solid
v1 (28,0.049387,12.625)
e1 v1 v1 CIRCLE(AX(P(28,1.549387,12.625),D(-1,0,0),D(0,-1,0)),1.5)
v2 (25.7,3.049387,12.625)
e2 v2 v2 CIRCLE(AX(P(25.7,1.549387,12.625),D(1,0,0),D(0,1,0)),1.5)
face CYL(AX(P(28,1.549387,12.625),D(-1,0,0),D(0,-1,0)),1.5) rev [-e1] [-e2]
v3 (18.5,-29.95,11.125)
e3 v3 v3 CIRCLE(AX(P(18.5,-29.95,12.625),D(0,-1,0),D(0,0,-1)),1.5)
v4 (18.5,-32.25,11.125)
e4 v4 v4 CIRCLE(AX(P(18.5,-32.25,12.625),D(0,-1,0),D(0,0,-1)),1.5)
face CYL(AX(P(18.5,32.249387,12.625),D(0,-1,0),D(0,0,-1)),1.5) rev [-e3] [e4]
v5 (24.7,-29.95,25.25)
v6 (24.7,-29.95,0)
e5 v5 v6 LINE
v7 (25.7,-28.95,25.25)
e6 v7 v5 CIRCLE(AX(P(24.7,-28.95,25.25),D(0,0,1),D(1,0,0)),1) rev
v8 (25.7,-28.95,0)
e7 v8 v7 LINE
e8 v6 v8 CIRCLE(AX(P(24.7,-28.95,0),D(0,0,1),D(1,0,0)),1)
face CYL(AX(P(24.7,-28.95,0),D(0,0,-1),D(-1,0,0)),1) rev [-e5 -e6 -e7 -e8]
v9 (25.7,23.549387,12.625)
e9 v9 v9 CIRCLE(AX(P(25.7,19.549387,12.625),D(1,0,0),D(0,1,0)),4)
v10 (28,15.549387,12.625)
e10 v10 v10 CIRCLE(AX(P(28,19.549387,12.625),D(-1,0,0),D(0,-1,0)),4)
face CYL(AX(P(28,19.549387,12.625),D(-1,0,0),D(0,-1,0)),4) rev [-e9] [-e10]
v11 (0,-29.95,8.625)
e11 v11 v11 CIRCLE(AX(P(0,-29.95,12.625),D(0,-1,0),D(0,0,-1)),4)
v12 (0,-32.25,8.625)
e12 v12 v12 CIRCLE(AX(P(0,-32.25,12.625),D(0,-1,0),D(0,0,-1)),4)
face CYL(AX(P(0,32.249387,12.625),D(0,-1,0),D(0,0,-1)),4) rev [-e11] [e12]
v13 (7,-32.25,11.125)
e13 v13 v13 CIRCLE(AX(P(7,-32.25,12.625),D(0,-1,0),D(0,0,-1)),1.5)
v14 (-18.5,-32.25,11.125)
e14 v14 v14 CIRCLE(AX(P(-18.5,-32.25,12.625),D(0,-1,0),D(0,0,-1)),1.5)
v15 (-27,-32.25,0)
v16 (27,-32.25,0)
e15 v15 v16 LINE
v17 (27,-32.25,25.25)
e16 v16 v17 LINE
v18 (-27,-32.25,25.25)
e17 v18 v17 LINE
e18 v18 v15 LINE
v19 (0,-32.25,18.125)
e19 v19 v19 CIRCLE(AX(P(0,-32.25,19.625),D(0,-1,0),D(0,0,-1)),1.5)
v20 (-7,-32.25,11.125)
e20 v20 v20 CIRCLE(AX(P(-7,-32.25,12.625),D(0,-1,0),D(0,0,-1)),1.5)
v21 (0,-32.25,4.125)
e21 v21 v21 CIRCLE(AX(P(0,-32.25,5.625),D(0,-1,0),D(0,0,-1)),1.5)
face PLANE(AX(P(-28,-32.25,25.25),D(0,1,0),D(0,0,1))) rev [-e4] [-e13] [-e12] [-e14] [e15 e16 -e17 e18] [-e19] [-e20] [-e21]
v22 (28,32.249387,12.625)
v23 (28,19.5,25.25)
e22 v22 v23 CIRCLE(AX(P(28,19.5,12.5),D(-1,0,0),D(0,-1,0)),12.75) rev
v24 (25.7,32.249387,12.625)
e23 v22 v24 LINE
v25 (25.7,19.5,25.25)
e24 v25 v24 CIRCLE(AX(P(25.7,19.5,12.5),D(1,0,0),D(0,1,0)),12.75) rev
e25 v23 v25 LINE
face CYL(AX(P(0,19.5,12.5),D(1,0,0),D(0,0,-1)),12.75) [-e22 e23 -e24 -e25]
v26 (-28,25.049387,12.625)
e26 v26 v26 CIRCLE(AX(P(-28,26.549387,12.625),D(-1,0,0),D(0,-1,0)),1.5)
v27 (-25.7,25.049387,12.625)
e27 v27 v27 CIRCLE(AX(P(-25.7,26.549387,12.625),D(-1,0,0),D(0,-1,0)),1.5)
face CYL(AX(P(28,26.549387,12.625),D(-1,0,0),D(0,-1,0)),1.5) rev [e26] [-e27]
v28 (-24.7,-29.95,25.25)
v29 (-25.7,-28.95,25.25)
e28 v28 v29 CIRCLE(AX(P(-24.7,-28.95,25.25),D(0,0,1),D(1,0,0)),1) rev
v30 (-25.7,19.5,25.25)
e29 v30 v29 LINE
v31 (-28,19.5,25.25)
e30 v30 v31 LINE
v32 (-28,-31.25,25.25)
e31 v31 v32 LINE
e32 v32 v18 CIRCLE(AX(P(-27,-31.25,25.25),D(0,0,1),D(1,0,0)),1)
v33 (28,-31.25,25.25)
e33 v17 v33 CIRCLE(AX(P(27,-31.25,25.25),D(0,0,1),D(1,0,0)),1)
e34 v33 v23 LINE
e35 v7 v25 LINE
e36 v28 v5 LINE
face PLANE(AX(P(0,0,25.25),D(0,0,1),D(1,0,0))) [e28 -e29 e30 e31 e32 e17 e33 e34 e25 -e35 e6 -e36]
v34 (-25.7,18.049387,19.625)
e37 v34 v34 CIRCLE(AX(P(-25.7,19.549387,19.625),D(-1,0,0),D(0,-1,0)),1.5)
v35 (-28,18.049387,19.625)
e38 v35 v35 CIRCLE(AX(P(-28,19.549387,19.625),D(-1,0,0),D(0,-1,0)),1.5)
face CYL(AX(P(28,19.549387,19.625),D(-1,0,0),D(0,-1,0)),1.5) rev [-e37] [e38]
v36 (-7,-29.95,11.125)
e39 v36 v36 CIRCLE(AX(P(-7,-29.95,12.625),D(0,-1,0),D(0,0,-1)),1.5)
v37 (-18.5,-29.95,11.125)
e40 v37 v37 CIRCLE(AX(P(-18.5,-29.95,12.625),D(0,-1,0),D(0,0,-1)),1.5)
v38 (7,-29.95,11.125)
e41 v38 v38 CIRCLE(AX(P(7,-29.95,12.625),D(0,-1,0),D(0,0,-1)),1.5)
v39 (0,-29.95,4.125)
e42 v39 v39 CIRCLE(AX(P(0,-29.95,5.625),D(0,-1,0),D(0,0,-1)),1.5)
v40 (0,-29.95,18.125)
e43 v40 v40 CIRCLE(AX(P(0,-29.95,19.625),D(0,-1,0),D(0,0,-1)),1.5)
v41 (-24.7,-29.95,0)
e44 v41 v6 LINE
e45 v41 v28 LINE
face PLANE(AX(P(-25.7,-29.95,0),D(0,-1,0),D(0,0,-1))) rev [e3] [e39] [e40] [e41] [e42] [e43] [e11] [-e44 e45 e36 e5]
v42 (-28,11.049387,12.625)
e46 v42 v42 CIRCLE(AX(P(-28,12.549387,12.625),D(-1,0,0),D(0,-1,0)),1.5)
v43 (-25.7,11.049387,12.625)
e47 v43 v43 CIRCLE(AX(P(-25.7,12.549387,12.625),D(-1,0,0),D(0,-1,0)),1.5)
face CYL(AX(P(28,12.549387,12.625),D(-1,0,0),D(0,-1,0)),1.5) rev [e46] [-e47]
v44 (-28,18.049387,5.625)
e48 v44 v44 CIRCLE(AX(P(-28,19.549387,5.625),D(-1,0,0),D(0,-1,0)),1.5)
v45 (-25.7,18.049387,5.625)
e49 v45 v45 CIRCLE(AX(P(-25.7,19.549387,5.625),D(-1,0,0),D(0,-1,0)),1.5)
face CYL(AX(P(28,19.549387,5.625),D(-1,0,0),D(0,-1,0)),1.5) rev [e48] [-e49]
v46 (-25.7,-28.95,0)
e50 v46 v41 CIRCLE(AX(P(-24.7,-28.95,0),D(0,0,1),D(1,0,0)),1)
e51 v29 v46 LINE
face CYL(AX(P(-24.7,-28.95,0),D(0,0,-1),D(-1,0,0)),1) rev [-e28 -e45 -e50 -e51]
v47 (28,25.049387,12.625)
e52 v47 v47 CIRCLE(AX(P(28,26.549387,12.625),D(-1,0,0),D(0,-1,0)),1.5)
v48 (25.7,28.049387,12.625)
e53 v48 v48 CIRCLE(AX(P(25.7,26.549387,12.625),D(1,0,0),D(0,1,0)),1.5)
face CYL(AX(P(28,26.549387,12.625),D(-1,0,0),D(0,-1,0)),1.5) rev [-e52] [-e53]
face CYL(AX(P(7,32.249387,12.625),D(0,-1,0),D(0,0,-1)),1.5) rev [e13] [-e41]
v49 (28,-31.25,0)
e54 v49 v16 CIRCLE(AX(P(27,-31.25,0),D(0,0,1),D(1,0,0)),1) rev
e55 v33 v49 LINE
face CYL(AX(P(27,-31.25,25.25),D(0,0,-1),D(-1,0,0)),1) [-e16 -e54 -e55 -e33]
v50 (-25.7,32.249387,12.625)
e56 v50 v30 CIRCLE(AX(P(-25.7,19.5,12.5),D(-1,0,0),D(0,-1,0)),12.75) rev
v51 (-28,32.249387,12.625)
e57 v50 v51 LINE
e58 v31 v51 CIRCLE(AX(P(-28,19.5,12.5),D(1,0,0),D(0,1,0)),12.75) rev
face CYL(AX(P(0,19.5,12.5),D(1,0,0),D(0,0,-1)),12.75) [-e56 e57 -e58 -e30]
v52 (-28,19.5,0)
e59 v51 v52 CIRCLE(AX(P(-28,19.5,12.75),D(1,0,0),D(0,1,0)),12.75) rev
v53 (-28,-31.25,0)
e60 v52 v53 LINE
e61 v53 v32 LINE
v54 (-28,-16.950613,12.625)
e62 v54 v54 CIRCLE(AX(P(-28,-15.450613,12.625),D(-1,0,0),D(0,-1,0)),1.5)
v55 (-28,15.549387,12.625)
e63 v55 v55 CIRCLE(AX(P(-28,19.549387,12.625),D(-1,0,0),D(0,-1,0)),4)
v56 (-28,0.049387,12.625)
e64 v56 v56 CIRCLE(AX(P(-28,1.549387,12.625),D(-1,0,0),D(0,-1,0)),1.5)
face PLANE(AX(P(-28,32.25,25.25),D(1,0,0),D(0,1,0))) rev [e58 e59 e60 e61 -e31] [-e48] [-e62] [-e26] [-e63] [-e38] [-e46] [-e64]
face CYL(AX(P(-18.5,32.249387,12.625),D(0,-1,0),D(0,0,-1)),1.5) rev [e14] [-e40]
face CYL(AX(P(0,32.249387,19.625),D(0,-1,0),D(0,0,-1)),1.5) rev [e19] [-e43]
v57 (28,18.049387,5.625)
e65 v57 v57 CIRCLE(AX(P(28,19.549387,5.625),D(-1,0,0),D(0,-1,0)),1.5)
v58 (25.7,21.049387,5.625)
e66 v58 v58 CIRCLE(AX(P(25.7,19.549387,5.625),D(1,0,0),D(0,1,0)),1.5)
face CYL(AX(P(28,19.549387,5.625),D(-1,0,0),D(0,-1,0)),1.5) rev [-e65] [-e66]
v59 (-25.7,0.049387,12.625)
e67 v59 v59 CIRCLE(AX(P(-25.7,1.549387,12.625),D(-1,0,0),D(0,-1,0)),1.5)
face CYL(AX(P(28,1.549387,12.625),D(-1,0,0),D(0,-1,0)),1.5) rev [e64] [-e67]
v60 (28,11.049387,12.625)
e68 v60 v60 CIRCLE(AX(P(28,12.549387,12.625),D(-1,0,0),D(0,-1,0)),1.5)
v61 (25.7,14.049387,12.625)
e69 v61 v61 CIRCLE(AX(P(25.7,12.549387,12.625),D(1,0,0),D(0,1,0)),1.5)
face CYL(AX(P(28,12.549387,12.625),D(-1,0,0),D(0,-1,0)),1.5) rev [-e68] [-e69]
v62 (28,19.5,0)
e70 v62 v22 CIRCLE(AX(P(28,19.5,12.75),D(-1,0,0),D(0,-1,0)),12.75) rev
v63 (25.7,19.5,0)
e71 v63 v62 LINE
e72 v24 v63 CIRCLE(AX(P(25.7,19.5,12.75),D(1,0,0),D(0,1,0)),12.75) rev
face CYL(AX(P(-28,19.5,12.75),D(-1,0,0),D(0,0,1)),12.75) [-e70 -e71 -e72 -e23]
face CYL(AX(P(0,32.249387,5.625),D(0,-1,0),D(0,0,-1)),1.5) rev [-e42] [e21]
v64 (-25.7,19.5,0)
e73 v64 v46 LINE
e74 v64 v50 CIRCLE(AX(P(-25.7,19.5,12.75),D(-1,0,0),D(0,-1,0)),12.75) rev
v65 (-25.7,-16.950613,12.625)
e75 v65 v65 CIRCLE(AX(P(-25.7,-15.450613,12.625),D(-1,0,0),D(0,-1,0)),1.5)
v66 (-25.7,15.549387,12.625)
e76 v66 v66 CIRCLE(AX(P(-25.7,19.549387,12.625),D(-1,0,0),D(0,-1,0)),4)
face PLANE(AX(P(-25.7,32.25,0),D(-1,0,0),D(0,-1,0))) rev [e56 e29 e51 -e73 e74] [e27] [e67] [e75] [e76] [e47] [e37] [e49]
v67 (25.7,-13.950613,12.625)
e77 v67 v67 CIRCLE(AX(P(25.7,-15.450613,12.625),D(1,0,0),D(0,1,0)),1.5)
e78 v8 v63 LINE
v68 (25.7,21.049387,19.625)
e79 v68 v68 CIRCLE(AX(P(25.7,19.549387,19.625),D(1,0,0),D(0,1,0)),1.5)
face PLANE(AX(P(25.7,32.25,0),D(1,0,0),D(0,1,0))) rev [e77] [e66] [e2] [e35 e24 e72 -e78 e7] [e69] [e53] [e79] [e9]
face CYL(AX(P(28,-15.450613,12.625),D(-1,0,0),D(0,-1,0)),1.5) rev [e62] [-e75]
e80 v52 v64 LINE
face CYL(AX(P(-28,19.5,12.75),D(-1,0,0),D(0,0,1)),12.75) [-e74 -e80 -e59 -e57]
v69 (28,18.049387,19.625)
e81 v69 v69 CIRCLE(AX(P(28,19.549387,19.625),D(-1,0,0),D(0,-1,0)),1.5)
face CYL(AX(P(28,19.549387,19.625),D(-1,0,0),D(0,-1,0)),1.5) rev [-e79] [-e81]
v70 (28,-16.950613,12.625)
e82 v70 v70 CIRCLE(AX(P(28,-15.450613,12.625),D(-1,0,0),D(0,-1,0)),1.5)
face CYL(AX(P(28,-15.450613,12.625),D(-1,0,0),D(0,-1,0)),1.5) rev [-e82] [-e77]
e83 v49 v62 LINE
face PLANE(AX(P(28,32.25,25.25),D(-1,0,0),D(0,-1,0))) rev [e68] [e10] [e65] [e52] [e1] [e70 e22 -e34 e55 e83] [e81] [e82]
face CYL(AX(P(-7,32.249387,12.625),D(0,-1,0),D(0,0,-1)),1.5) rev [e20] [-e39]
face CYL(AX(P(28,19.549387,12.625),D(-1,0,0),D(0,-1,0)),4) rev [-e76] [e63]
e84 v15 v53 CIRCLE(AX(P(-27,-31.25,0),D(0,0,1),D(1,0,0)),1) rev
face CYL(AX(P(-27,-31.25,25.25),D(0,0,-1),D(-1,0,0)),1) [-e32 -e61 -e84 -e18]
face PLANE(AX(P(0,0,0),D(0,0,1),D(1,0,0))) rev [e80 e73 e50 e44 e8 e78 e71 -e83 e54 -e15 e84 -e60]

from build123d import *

# Parameters (mm, degrees)
SKETCH1_W           = 56
SKETCH1_H           = 64.5
BOSS_EXTRUDE1_DEPTH = 25.25
SKETCH2_W           = 51.4
SKETCH2_H           = 62.2
CUT_EXTRUDE1_DEPTH  = 50.614765947
FILLET1_R           = 1
FILLET3_R           = 12.75
SKETCH4_R           = 4
SKETCH4_R_2         = 1.5
CUT_EXTRUDE3_DEPTH  = 75.710999554
SKETCH5_R           = 4
SKETCH5_R_2         = 1.5
CUT_EXTRUDE4_DEPTH  = 70.380292591


with BuildPart() as part:
    # Sketch1 → Boss-Extrude1 (new body)
    with BuildSketch(Plane.XY):
        Rectangle(SKETCH1_W, SKETCH1_H)
    extrude(amount=BOSS_EXTRUDE1_DEPTH)

    # Sketch2 → Cut-Extrude1 (cut, through all)
    with BuildSketch(Plane.XY.offset(25.25)):
        with Locations((0, 1.15)):
            Rectangle(SKETCH2_W, SKETCH2_H)
    extrude(amount=-CUT_EXTRUDE1_DEPTH, mode=Mode.SUBTRACT)

    # Fillet1
    fillet1_edges = [part.edges().sort_by_distance(p)[0] for p in [
        (-25.7, -29.95, 12.625),
        (25.7, -29.95, 12.625),
        (28, -32.25, 12.625),
        (-28, -32.25, 12.625),
    ]]
    fillet(fillet1_edges, radius=FILLET1_R)

    # Fillet3
    # the kernel refuses this fillet: 12.75 mm, written as the material it takes off along each edge
    with BuildSketch(Plane(origin=(-59.875, 32.25, 25.25), x_dir=(0, 0, -1), z_dir=(1, 0, 0)), Plane(origin=(-6.175, 32.25, 25.25), x_dir=(0, 0, -1), z_dir=(1, 0, 0)), Plane(origin=(-59.875, 32.25, 0), x_dir=(0, -1, 0), z_dir=(1, 0, 0)), Plane(origin=(-6.175, 32.25, 0), x_dir=(0, -1, 0), z_dir=(1, 0, 0))) as fillet3_piece_1:
        with BuildLine():
            CenterArc((FILLET3_R, -FILLET3_R), FILLET3_R, 90, 90)
            Line((0, -FILLET3_R), (0, 0))
            Line((0, 0), (FILLET3_R, 0))
        make_face()
    extrude(amount=66.05, mode=Mode.SUBTRACT)

    # Sketch4 → Cut-Extrude3 (cut, through all)
    with BuildSketch(Plane.XZ.offset(32.25)):
        with Locations(Location((0, 12.625, 0), (0, 0, 270))):
            Circle(SKETCH4_R)
        with Locations(Location((7, 12.625, 0), (0, 0, 270))):
            Circle(SKETCH4_R_2)
        with Locations(Location((-7, 12.625, 0), (0, 0, 270))):
            Circle(SKETCH4_R_2)
        with Locations(Location((0, 5.625, 0), (0, 0, 270))):
            Circle(SKETCH4_R_2)
        with Locations(Location((0, 19.625, 0), (0, 0, 270))):
            Circle(SKETCH4_R_2)
        with Locations(Location((18.5, 12.625, 0), (0, 0, 270))):
            Circle(SKETCH4_R_2)
        with Locations(Location((-18.5, 12.625, 0), (0, 0, 270))):
            Circle(SKETCH4_R_2)
    extrude(amount=-CUT_EXTRUDE3_DEPTH, mode=Mode.SUBTRACT)

    # Sketch5 → Cut-Extrude4 (cut, through all)
    with BuildSketch(Plane.ZY.offset(28)):
        with Locations(Location((12.625, 19.54938724, 0), (0, 0, 270))):
            Circle(SKETCH5_R)
        with Locations(Location((12.625, 26.54938724, 0), (0, 0, 270))):
            Circle(SKETCH5_R_2)
        with Locations(Location((19.625, 19.54938724, 0), (0, 0, 270))):
            Circle(SKETCH5_R_2)
        with Locations(Location((12.625, 12.54938724, 0), (0, 0, 270))):
            Circle(SKETCH5_R_2)
        with Locations(Location((5.625, 19.54938724, 0), (0, 0, 270))):
            Circle(SKETCH5_R_2)
        with Locations(Location((12.625, 1.54938724, 0), (0, 0, 270))):
            Circle(SKETCH5_R_2)
        with Locations(Location((12.625, -15.45061276, 0), (0, 0, 270))):
            Circle(SKETCH5_R_2)
    extrude(amount=-CUT_EXTRUDE4_DEPTH, mode=Mode.SUBTRACT)


solid = part.part
